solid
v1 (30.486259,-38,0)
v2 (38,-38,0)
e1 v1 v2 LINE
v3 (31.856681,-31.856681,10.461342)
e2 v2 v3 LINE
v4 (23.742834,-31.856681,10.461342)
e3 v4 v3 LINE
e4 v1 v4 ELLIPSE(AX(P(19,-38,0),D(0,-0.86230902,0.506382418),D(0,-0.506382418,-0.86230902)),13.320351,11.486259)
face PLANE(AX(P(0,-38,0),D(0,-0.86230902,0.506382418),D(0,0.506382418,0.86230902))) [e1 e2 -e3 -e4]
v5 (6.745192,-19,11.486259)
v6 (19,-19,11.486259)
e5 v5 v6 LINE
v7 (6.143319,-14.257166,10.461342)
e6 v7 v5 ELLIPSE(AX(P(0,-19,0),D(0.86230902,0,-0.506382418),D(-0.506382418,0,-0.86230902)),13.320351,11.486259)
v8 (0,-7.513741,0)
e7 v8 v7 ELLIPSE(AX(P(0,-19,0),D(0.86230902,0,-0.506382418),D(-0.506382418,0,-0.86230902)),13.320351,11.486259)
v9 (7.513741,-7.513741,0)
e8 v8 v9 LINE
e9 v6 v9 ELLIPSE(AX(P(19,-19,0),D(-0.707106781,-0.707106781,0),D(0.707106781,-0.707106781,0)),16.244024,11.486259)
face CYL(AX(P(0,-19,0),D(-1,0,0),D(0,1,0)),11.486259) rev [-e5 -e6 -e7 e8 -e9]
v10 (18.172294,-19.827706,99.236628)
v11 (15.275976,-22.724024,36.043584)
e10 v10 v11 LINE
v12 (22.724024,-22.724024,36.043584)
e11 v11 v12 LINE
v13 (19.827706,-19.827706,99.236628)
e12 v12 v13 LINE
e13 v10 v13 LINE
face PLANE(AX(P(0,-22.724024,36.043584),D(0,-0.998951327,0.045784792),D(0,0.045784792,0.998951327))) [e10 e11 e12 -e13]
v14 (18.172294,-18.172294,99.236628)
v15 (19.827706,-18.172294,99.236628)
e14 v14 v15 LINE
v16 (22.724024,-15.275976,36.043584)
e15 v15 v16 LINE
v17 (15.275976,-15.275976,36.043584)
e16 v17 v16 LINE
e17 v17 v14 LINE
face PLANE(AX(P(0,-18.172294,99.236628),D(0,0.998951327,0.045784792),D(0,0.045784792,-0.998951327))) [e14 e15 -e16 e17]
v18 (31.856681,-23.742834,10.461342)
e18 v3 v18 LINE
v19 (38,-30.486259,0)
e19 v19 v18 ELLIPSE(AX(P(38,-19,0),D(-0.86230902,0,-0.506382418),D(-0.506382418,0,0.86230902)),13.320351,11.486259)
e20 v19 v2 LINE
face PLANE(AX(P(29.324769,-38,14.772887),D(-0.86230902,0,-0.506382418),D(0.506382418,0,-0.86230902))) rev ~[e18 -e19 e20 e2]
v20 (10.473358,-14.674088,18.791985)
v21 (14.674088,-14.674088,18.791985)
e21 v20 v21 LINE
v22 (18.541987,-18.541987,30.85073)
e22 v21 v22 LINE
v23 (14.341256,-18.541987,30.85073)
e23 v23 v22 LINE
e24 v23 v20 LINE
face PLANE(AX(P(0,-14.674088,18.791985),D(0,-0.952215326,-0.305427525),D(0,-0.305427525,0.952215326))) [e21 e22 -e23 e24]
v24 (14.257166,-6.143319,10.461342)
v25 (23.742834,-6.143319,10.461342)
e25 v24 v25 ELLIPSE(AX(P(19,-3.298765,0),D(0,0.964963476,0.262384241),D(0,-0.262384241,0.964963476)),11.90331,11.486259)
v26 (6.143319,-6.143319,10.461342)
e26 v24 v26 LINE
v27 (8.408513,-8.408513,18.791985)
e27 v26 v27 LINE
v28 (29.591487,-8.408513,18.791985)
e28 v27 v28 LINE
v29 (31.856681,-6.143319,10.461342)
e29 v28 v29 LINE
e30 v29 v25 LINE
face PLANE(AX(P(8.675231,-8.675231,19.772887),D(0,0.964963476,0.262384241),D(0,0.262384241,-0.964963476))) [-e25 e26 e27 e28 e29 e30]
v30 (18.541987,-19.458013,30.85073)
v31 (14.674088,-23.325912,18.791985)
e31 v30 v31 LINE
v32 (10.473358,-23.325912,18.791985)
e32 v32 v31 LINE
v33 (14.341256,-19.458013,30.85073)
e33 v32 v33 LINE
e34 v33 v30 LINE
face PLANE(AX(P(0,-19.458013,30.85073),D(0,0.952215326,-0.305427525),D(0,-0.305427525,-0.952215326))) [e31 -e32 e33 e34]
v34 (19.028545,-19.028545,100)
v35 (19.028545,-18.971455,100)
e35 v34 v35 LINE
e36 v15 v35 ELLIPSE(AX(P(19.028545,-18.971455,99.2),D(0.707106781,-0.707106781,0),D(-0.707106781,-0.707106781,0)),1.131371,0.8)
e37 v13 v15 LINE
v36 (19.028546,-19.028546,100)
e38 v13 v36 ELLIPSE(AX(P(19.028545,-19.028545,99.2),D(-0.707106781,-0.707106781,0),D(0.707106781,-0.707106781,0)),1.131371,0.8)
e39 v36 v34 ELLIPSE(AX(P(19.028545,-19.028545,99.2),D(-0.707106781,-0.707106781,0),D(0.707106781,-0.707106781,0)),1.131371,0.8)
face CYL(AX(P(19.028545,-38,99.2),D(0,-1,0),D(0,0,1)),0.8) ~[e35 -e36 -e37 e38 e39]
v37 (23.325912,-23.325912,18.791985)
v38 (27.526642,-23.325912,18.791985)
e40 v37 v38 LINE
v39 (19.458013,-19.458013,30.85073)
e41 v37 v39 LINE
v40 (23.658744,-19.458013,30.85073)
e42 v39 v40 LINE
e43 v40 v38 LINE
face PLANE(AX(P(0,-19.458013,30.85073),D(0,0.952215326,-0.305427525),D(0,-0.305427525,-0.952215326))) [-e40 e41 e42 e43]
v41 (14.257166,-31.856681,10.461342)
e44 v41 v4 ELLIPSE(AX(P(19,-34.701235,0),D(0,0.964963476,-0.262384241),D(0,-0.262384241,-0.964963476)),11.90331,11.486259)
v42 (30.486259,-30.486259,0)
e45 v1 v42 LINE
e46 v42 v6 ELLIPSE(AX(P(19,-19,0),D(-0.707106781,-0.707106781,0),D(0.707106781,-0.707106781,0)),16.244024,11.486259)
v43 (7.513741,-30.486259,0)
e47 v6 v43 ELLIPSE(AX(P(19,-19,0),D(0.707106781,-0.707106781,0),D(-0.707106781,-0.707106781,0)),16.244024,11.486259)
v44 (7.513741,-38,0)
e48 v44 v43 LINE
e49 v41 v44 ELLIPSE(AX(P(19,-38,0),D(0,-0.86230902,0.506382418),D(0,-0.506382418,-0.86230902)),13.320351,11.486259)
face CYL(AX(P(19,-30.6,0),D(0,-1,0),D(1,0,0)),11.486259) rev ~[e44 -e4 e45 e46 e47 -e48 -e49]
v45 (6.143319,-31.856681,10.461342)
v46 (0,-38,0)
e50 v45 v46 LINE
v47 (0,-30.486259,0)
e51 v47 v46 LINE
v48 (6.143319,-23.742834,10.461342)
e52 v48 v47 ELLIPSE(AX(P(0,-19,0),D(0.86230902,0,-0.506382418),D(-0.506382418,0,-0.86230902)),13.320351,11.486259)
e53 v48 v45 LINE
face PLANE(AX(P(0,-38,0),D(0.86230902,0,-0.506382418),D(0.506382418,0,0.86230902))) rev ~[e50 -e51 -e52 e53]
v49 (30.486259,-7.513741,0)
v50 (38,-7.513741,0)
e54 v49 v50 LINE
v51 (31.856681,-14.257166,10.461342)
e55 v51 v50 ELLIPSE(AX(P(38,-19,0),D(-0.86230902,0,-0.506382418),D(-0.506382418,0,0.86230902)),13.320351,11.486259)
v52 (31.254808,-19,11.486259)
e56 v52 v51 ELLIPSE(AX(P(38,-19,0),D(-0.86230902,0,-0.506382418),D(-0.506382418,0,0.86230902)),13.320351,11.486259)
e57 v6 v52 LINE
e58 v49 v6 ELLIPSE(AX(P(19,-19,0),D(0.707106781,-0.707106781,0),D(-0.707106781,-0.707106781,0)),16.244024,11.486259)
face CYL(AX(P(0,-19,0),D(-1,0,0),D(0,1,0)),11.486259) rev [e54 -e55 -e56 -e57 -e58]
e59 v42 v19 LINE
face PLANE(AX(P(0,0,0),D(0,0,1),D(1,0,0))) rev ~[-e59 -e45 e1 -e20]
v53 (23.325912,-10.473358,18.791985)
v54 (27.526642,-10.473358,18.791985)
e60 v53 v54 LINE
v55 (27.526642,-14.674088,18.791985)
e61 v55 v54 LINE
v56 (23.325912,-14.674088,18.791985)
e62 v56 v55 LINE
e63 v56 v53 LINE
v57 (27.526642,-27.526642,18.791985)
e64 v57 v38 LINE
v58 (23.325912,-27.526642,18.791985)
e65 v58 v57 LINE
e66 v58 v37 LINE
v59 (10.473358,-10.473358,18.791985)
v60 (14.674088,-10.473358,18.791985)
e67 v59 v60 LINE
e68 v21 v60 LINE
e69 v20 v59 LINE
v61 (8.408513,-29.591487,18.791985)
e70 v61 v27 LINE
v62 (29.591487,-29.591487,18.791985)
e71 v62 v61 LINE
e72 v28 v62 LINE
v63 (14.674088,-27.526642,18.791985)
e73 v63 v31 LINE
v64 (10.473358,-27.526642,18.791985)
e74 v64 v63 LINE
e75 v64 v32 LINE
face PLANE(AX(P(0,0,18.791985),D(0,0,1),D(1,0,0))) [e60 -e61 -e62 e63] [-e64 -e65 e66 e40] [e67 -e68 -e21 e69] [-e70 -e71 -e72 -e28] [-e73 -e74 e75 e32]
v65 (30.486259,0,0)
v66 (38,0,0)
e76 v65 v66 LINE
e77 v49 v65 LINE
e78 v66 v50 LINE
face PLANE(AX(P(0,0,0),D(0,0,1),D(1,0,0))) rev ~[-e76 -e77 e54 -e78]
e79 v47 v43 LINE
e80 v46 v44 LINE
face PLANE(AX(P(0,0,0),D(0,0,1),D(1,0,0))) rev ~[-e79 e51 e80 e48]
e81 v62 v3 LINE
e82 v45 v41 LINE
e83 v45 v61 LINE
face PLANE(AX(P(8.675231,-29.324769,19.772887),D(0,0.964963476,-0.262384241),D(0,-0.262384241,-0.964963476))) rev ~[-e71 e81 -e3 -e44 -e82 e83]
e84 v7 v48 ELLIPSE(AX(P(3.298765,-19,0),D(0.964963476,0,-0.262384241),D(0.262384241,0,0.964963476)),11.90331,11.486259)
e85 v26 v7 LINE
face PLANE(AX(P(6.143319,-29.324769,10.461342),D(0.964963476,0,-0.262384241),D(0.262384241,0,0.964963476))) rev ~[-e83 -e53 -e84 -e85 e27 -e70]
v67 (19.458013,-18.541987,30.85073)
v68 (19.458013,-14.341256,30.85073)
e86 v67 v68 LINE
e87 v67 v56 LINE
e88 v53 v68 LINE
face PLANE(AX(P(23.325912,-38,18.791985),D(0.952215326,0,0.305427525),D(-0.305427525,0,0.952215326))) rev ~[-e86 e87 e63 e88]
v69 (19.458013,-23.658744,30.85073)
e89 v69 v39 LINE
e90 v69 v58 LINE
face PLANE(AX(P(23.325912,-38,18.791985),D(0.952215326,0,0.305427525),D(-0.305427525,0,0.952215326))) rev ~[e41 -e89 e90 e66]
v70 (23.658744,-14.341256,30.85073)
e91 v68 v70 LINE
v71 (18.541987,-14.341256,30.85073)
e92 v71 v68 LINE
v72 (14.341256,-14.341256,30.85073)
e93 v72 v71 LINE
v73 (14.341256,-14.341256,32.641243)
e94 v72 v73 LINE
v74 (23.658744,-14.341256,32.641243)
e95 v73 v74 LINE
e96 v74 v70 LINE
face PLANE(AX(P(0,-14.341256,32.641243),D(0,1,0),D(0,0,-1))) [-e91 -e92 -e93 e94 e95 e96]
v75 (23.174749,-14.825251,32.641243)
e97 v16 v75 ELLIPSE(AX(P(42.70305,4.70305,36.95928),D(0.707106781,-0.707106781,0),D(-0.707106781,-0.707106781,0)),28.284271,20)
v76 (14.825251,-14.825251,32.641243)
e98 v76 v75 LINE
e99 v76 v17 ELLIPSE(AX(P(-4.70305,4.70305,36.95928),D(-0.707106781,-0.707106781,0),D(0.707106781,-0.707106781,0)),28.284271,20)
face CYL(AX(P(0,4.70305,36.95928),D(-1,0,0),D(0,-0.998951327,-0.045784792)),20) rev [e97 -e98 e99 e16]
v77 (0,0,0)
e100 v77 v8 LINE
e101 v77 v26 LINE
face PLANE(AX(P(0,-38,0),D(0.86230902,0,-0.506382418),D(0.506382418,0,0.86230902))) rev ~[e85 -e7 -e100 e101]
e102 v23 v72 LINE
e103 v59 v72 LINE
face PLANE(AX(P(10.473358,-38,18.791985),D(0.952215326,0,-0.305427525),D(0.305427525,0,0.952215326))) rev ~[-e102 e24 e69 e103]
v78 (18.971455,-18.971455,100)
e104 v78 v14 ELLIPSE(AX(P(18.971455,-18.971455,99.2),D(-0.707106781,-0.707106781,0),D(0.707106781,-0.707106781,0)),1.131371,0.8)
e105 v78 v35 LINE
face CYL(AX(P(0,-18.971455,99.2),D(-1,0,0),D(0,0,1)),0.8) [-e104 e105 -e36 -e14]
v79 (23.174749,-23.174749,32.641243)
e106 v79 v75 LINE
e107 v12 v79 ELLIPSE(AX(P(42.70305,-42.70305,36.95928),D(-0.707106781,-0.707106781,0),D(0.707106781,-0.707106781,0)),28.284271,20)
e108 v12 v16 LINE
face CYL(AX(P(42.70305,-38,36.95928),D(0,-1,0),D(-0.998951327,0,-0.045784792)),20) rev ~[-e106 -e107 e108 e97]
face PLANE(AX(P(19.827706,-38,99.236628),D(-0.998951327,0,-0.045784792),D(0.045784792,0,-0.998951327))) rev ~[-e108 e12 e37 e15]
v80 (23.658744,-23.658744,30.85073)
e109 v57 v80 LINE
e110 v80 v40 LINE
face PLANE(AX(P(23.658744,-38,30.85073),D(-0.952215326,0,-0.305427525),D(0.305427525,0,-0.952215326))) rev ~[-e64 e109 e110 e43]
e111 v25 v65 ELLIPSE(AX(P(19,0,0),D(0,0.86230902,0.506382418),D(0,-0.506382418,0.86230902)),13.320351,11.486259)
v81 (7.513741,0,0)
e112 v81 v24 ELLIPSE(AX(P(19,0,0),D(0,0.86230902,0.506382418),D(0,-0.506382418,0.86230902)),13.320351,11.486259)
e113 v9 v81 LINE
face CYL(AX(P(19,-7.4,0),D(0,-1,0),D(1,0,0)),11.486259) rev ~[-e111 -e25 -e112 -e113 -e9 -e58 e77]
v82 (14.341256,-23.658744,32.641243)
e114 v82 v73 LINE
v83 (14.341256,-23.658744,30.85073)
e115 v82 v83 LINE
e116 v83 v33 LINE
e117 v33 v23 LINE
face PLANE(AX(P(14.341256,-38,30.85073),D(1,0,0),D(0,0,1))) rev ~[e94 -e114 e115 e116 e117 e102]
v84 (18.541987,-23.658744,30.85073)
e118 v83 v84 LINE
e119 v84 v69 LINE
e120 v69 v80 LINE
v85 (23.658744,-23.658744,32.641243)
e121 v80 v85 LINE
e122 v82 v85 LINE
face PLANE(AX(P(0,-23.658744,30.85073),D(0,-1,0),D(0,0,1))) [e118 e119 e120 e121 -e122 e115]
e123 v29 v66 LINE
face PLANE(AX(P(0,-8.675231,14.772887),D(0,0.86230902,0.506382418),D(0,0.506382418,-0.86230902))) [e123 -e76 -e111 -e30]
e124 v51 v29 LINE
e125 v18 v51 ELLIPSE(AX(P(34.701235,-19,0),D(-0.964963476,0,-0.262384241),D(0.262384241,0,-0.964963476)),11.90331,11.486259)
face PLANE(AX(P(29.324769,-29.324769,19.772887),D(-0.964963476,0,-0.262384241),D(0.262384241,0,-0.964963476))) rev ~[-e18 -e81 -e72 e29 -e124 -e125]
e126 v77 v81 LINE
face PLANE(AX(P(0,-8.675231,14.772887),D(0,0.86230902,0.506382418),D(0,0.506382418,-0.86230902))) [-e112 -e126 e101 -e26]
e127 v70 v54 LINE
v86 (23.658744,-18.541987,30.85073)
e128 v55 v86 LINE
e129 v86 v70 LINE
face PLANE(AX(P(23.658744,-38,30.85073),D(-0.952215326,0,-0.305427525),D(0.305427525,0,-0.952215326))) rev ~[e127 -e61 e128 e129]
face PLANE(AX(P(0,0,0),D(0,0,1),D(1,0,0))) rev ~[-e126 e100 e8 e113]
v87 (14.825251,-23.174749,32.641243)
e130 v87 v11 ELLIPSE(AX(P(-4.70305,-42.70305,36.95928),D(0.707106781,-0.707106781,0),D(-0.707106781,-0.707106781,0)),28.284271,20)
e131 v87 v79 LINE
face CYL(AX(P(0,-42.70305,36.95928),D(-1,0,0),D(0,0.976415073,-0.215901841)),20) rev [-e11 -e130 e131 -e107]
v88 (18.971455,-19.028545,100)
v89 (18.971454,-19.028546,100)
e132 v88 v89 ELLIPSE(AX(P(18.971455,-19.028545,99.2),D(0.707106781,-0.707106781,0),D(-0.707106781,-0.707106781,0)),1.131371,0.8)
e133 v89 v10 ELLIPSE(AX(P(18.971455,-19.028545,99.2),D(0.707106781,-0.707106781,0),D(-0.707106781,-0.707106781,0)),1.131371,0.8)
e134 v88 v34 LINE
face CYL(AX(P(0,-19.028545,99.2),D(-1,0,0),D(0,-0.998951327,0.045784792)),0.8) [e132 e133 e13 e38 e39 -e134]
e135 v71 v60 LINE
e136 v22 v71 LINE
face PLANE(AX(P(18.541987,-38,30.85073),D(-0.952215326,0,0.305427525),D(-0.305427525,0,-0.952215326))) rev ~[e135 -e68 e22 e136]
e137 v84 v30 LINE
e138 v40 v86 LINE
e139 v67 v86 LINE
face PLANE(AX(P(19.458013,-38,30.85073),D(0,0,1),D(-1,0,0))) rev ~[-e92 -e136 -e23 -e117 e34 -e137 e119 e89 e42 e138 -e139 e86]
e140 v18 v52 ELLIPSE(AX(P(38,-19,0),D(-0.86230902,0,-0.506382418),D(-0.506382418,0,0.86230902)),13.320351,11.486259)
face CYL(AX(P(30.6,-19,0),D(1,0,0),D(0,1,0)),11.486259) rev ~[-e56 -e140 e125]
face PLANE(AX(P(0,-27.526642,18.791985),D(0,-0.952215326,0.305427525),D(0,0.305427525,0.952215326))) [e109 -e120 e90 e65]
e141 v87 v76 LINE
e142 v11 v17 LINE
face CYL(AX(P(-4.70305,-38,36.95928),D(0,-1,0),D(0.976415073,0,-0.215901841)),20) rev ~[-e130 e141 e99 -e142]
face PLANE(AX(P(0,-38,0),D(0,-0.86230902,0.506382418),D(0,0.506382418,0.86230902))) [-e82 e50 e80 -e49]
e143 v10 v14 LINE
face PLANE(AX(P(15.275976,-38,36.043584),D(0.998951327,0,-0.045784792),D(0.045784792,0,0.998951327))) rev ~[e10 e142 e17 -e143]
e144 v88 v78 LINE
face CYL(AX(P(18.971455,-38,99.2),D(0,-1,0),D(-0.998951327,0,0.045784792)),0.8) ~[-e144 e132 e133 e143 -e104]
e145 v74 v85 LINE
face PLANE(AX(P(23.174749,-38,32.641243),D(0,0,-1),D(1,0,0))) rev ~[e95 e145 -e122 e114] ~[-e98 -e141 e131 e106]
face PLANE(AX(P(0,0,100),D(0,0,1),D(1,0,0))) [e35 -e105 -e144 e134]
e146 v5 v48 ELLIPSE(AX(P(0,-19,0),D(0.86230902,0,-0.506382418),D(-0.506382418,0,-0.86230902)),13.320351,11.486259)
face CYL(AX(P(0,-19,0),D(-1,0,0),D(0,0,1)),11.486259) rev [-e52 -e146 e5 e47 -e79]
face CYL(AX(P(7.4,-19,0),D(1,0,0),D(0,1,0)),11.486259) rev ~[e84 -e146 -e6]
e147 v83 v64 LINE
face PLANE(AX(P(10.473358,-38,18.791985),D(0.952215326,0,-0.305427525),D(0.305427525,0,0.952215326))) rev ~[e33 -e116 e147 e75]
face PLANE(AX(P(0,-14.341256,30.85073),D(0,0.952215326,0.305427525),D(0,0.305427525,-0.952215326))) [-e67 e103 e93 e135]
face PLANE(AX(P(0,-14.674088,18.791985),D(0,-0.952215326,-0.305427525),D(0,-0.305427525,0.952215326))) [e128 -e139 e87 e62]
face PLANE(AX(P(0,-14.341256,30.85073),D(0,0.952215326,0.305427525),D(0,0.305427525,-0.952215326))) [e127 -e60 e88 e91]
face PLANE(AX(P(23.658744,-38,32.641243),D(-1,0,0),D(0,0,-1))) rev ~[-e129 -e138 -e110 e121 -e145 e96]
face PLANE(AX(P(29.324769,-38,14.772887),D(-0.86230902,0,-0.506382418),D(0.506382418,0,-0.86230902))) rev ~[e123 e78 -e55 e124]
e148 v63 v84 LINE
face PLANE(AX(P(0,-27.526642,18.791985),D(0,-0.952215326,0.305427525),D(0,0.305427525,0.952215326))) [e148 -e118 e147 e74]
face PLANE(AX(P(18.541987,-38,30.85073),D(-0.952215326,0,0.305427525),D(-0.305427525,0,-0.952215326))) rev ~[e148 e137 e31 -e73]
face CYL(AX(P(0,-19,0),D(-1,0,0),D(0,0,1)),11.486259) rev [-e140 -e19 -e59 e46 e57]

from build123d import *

# Parameters (mm, degrees)
F0_W          = 38
F0_H          = 100
F1_DEPTH      = 38
F3_DEPTH      = 38.001
F4_W          = 59.0429029957
F4_H          = 114.0045975335
F5_DEPTH      = 38.001
F6_T4_DEPTH   = 20.6495370786
F6_T10_DEPTH  = 33.6326816688
F6_T16_DEPTH  = 20.6495370786
F6_S17_R      = 11.4862592402
F6_T18_DEPTH  = 13
F6_T25_DEPTH  = 20.6495370786
F6_T31_DEPTH  = 33.6326816688
F6_T37_DEPTH  = 33.6326816688
F6_T43_DEPTH  = 20.6495370786
F6_T49_DEPTH  = 20.6495370786
F6_S53_R      = 11.4862592402
F6_T54_DEPTH  = 13
F6_T58_DEPTH  = 33.6326816688
F6_T64_DEPTH  = 20.6495370786
F6_T70_DEPTH  = 33.6326816688
F6_T76_DEPTH  = 20.6495370786
F6_T82_DEPTH  = 20.6495370786
F6_S84_R      = 11.4862592402
F6_T85_DEPTH  = 13
F6_T91_DEPTH  = 33.6326816688
F6_T97_DEPTH  = 20.6495370786
F6_T103_DEPTH = 33.6326816688
F6_T109_DEPTH = 20.6495370786
F6_T115_DEPTH = 20.6495370786
F6_S119_R     = 11.4862592402
F6_T120_DEPTH = 13
F6_T124_DEPTH = 33.6326816688
F6_T130_DEPTH = 20.6495370786
F6_T137_DEPTH = 33.6326816688
F6_T143_DEPTH = 33.6326816688
F6_T152_DEPTH = 33.6326816688
F6_T158_DEPTH = 33.6326816688
F6_T167_DEPTH = 33.6326816688
F6_T173_DEPTH = 33.6326816688
F6_T182_DEPTH = 33.6326816688
F6_T188_DEPTH = 33.6326816688


# Not quite as in the source:
# - a fillet or chamfer that OpenCascade refuses, or shapes differently, is made with other operations: its cross-section is extruded or revolved along the edge and cut away or added


with BuildPart() as f1:
    # F0 (on Front) → F1 (new body)
    with BuildSketch(Plane.XZ):
        with Locations((19, 50)):
            Rectangle(F0_W, F0_H)
    extrude(amount=F1_DEPTH)

    # F2 (on face) → F3 (cut, through all)
    with BuildSketch(Plane.XZ.offset(38)):
        with BuildLine():
            ThreePointArc((18.1722940034, 99.2366278339), (18.4188712552, 99.7784903919), (18.9714550646, 100))
            Line((18.9714550646, 100), (0, 100))
            Line((0, 100), (0, 0))
            Line((0, 0), (8.6752314607, 14.7728872032))
            Line((8.6752314607, 14.7728872032), (8.6752314607, 18.7919850665))
            Line((8.6752314607, 18.7919850665), (10.4733575719, 18.7919850665))
            Line((10.4733575719, 18.7919850665), (14.3412563191, 30.8507295043))
            Line((14.3412563191, 30.8507295043), (14.3412563191, 32.6412431896))
            Line((14.3412563191, 32.6412431896), (14.8252512637, 32.6412431896))
            ThreePointArc((14.8252512637, 32.6412431896), (15.1237302322, 34.3327275734), (15.2759763299, 36.0435841545))
            Line((15.2759763299, 36.0435841545), (18.1722940034, 99.2366278339))
        make_face()
        with BuildLine():
            Line((7.5137407598, 0), (30.4862592402, 0))
            ThreePointArc((30.4862592402, 0), (27.1220117992, 8.1220117992), (19, 11.4862592402))
            ThreePointArc((19, 11.4862592402), (10.8779882008, 8.1220117992), (7.5137407598, 0))
        make_face()
        with BuildLine():
            Line((38, 100), (19.0285449354, 100))
            ThreePointArc((19.0285449354, 100), (19.5811287448, 99.7784903919), (19.8277059966, 99.2366278339))
            Line((19.8277059966, 99.2366278339), (22.7240236701, 36.0435841545))
            ThreePointArc((22.7240236701, 36.0435841545), (22.8762697678, 34.3327275734), (23.1747487363, 32.6412431896))
            Line((23.1747487363, 32.6412431896), (23.6587436809, 32.6412431896))
            Line((23.6587436809, 32.6412431896), (23.6587436809, 30.8507295043))
            Line((23.6587436809, 30.8507295043), (27.5266424281, 18.7919850665))
            Line((27.5266424281, 18.7919850665), (29.3247685393, 18.7919850665))
            Line((29.3247685393, 18.7919850665), (29.3247685393, 14.7728872032))
            Line((29.3247685393, 14.7728872032), (38, 0))
            Line((38, 0), (38, 100))
        make_face()
        Polygon((18.5419868585, 30.8507295043), (14.6740881113, 18.7919850665), (23.3259118887, 18.7919850665), (19.4580131415, 30.8507295043), align=None)
    extrude(amount=-F3_DEPTH, mode=Mode.SUBTRACT)

    # F4 (on Right) → F5 (cut, through all)
    with BuildSketch(Plane.YZ):
        with Locations((-17.0494974502, 52.1172431763)):
            Rectangle(F4_W, F4_H)
        with BuildLine():
            Line((-19.0285449354, 100), (-19, 100))
            Line((-19, 100), (-18.9714550646, 100))
            ThreePointArc((-18.9714550646, 100), (-18.4188712552, 99.7784903919), (-18.1722940034, 99.2366278339))
            Line((-18.1722940034, 99.2366278339), (-15.2759763299, 36.0435841545))
            ThreePointArc((-15.2759763299, 36.0435841545), (-15.1237302322, 34.3327275734), (-14.8252512637, 32.6412431896))
            Line((-14.8252512637, 32.6412431896), (-14.3412563191, 32.6412431896))
            Line((-14.3412563191, 32.6412431896), (-14.3412563191, 30.8507295043))
            Line((-14.3412563191, 30.8507295043), (-10.4733575719, 18.7919850665))
            Line((-10.4733575719, 18.7919850665), (-8.6752314607, 18.7919850665))
            Line((-8.6752314607, 18.7919850665), (-8.6752314607, 14.7728872032))
            Line((-8.6752314607, 14.7728872032), (0, 0))
            Line((0, 0), (-7.5137407598, 0))
            ThreePointArc((-7.5137407598, 0), (-10.8779882008, 8.1220117992), (-19, 11.4862592402))
            ThreePointArc((-19, 11.4862592402), (-27.1220117992, 8.1220117992), (-30.4862592402, 0))
            Line((-30.4862592402, 0), (-38, 0))
            Line((-38, 0), (-29.3247685393, 14.7728872032))
            Line((-29.3247685393, 14.7728872032), (-29.3247685393, 18.7919850665))
            Line((-29.3247685393, 18.7919850665), (-27.5266424281, 18.7919850665))
            Line((-27.5266424281, 18.7919850665), (-23.6587436809, 30.8507295043))
            Line((-23.6587436809, 30.8507295043), (-23.6587436809, 32.6412431896))
            Line((-23.6587436809, 32.6412431896), (-23.1747487363, 32.6412431896))
            ThreePointArc((-23.1747487363, 32.6412431896), (-22.8762697678, 34.3327275734), (-22.7240236701, 36.0435841545))
            Line((-22.7240236701, 36.0435841545), (-19.8277059966, 99.2366278339))
            ThreePointArc((-19.8277059966, 99.2366278339), (-19.5811287448, 99.7784903919), (-19.0285449354, 100))
        make_face(mode=Mode.SUBTRACT)
        Polygon((-14.6740881113, 18.7919850665), (-18.5419868585, 30.8507295043), (-19.4580131415, 30.8507295043), (-23.3259118887, 18.7919850665), align=None)
    extrude(amount=F5_DEPTH, mode=Mode.SUBTRACT)

    # F6: chamfer of 5 on 4 edges, made by hand


with BuildPart() as f6_tool2:
    # F6_s3 → F6_t4 (new body)
    with BuildSketch(Plane.XZ.offset(29.3247685393)):
        Polygon((6.1433193707, 10.461342101), (8.6752314607, 19.7728872032), (8.6752314607, 14.7728872032), align=None)
    extrude(amount=-F6_T4_DEPTH)

    split(bisect_by=Plane(origin=(0, -28.2559201757, 16.59300882), x_dir=(1, 0, 0), z_dir=(0, -0.8623090204, 0.506382418)), keep=Keep.TOP)

    split(bisect_by=Plane.XY.offset(18.7919850665), keep=Keep.BOTTOM)


with BuildPart() as f1_1:
    add(f1.part)

    # F6_t1: union F6_tool2
    add(f6_tool2.part)


with BuildPart() as f6_tool8:
    # F6_s9 → F6_t10 (new body)
    with BuildSketch(Plane.XZ.offset(42.3079131295)):
        Polygon((6.1433193707, 10.461342101), (8.6752314607, 19.7728872032), (8.6752314607, 14.7728872032), align=None)
    extrude(amount=-F6_T10_DEPTH)

    split(bisect_by=Plane(origin=(0, -28.2559201757, 16.59300882), x_dir=(1, 0, 0), z_dir=(0, 0.8623090204, -0.506382418)), keep=Keep.TOP)

    split(bisect_by=Plane.XZ.offset(29.3247685393), keep=Keep.TOP)


with BuildPart() as f1_2:
    add(f1_1.part)

    # F6_t7: union F6_tool8
    add(f6_tool8.part)


with BuildPart() as f6_tool14:
    # F6_s15 → F6_t16 (new body)
    with BuildSketch(Plane.XZ.offset(29.3247685393)):
        Polygon((6.1433193707, 10.461342101), (8.6752314607, 19.7728872032), (8.6752314607, 14.7728872032), align=None)
    extrude(amount=-F6_T16_DEPTH)

    # F6_s17 → F6_t18 (cut, symmetric)
    with BuildSketch(Plane.YZ.offset(7.4)):
        with Locations((-19, 0)):
            Circle(F6_S17_R)
    extrude(amount=F6_T18_DEPTH, both=True, mode=Mode.SUBTRACT)

    split(bisect_by=Plane(origin=(0, -28.2559201757, 16.59300882), x_dir=(1, 0, 0), z_dir=(0, 0.8623090204, -0.506382418)), keep=Keep.TOP)

    split(bisect_by=Plane(origin=(0, 0, 0), x_dir=(1, 0, 0), z_dir=(0, -0.8623090204, -0.506382418)), keep=Keep.TOP)

    split(bisect_by=Plane.XY.offset(18.7919850665), keep=Keep.BOTTOM)


with BuildPart() as f1_3:
    add(f1_2.part)

    # F6_t13: union F6_tool14
    add(f6_tool14.part)


with BuildPart() as f6_tool23:
    # F6_s24 → F6_t25 (new body)
    with BuildSketch(Plane.XZ.offset(29.3247685393)):
        Polygon((6.1433193707, 10.461342101), (8.6752314607, 19.7728872032), (8.6752314607, 14.7728872032), align=None)
    extrude(amount=-F6_T25_DEPTH)

    split(bisect_by=Plane(origin=(0, 0, 0), x_dir=(1, 0, 0), z_dir=(0, 0.8623090204, 0.506382418)), keep=Keep.TOP)

    split(bisect_by=Plane.XY.offset(18.7919850665), keep=Keep.BOTTOM)


with BuildPart() as f1_4:
    add(f1_3.part)

    # F6_t22: union F6_tool23
    add(f6_tool23.part)


with BuildPart() as f6_tool29:
    # F6_s30 → F6_t31 (new body)
    with BuildSketch(Plane.XZ.offset(29.3247685393)):
        Polygon((6.1433193707, 10.461342101), (8.6752314607, 19.7728872032), (8.6752314607, 14.7728872032), align=None)
    extrude(amount=-F6_T31_DEPTH)

    split(bisect_by=Plane(origin=(0, 0, 0), x_dir=(1, 0, 0), z_dir=(0, -0.8623090204, -0.506382418)), keep=Keep.TOP)

    split(bisect_by=Plane.XZ.offset(8.6752314607), keep=Keep.BOTTOM)


with BuildPart() as f1_5:
    add(f1_4.part)

    # F6_t28: union F6_tool29
    add(f6_tool29.part)


with BuildPart() as f6_tool35:
    # F6_s36 → F6_t37 (new body)
    with BuildSketch(Plane.YZ.offset(-4.3079131295)):
        Polygon((-29.3247685393, 19.7728872032), (-31.8566806293, 10.461342101), (-29.3247685393, 14.7728872032), align=None)
    extrude(amount=F6_T37_DEPTH)

    split(bisect_by=Plane(origin=(0, 0, 0), x_dir=(0, 1, 0), z_dir=(0.8623090204, 0, -0.506382418)), keep=Keep.TOP)

    split(bisect_by=Plane.YZ.offset(8.6752314607), keep=Keep.BOTTOM)


with BuildPart() as f1_6:
    add(f1_5.part)

    # F6_t34: union F6_tool35
    add(f6_tool35.part)


with BuildPart() as f6_tool41:
    # F6_s42 → F6_t43 (new body)
    with BuildSketch(Plane.YZ.offset(8.6752314607)):
        Polygon((-29.3247685393, 19.7728872032), (-31.8566806293, 10.461342101), (-29.3247685393, 14.7728872032), align=None)
    extrude(amount=F6_T43_DEPTH)

    split(bisect_by=Plane(origin=(0, 0, 0), x_dir=(0, 1, 0), z_dir=(-0.8623090204, 0, 0.506382418)), keep=Keep.TOP)

    split(bisect_by=Plane.XY.offset(18.7919850665), keep=Keep.BOTTOM)


with BuildPart() as f1_7:
    add(f1_6.part)

    # F6_t40: union F6_tool41
    add(f6_tool41.part)


with BuildPart() as f6_tool47:
    # F6_s48 → F6_t49 (new body)
    with BuildSketch(Plane.YZ.offset(8.6752314607)):
        Polygon((-29.3247685393, 19.7728872032), (-31.8566806293, 10.461342101), (-29.3247685393, 14.7728872032), align=None)
    extrude(amount=F6_T49_DEPTH)

    split(bisect_by=Plane(origin=(0, 0, 0), x_dir=(0, 1, 0), z_dir=(0.8623090204, 0, -0.506382418)), keep=Keep.TOP)

    split(bisect_by=Plane.XY.offset(18.7919850665), keep=Keep.BOTTOM)

    split(bisect_by=Plane(origin=(28.2559201757, 0, 16.59300882), x_dir=(0, 1, 0), z_dir=(-0.8623090204, 0, -0.506382418)), keep=Keep.TOP)

    # F6_s53 → F6_t54 (cut, symmetric)
    with BuildSketch(Plane.XZ.offset(30.6)):
        with Locations((19, 0)):
            Circle(F6_S53_R)
    extrude(amount=F6_T54_DEPTH, both=True, mode=Mode.SUBTRACT)


with BuildPart() as f1_8:
    add(f1_7.part)

    # F6_t46: union F6_tool47
    add(f6_tool47.part)


with BuildPart() as f6_tool56:
    # F6_s57 → F6_t58 (new body)
    with BuildSketch(Plane.YZ.offset(8.6752314607)):
        Polygon((-29.3247685393, 19.7728872032), (-31.8566806293, 10.461342101), (-29.3247685393, 14.7728872032), align=None)
    extrude(amount=F6_T58_DEPTH)

    split(bisect_by=Plane.YZ.offset(29.3247685393), keep=Keep.TOP)

    split(bisect_by=Plane(origin=(28.2559201757, 0, 16.59300882), x_dir=(0, 1, 0), z_dir=(-0.8623090204, 0, -0.506382418)), keep=Keep.TOP)


with BuildPart() as f1_9:
    add(f1_8.part)

    # F6_t55: union F6_tool56
    add(f6_tool56.part)


with BuildPart() as f6_tool62:
    # F6_s63 → F6_t64 (new body)
    with BuildSketch(Plane.YZ.offset(8.6752314607)):
        Polygon((-29.3247685393, 19.7728872032), (-31.8566806293, 10.461342101), (-29.3247685393, 14.7728872032), align=None)
    extrude(amount=F6_T64_DEPTH)

    split(bisect_by=Plane.XY.offset(18.7919850665), keep=Keep.BOTTOM)

    split(bisect_by=Plane(origin=(28.2559201757, 0, 16.59300882), x_dir=(0, 1, 0), z_dir=(0.8623090204, 0, 0.506382418)), keep=Keep.TOP)


with BuildPart() as f1_10:
    add(f1_9.part)

    # F6_t61: union F6_tool62
    add(f6_tool62.part)


with BuildPart() as f6_tool68:
    # F6_s69 → F6_t70 (new body)
    with BuildSketch(Plane.XZ.offset(42.3079131295)):
        Polygon((29.3247685393, 19.7728872032), (31.8566806293, 10.461342101), (29.3247685393, 14.7728872032), align=None)
    extrude(amount=-F6_T70_DEPTH)

    split(bisect_by=Plane.XZ.offset(29.3247685393), keep=Keep.TOP)

    split(bisect_by=Plane(origin=(0, -28.2559201757, 16.59300882), x_dir=(1, 0, 0), z_dir=(0, 0.8623090204, -0.506382418)), keep=Keep.TOP)


with BuildPart() as f1_11:
    add(f1_10.part)

    # F6_t67: union F6_tool68
    add(f6_tool68.part)


with BuildPart() as f6_tool74:
    # F6_s75 → F6_t76 (new body)
    with BuildSketch(Plane.XZ.offset(29.3247685393)):
        Polygon((29.3247685393, 19.7728872032), (31.8566806293, 10.461342101), (29.3247685393, 14.7728872032), align=None)
    extrude(amount=-F6_T76_DEPTH)

    split(bisect_by=Plane.XY.offset(18.7919850665), keep=Keep.BOTTOM)

    split(bisect_by=Plane(origin=(0, -28.2559201757, 16.59300882), x_dir=(1, 0, 0), z_dir=(0, -0.8623090204, 0.506382418)), keep=Keep.TOP)


with BuildPart() as f1_12:
    add(f1_11.part)

    # F6_t73: union F6_tool74
    add(f6_tool74.part)


with BuildPart() as f6_tool80:
    # F6_s81 → F6_t82 (new body)
    with BuildSketch(Plane.XZ.offset(29.3247685393)):
        Polygon((29.3247685393, 19.7728872032), (31.8566806293, 10.461342101), (29.3247685393, 14.7728872032), align=None)
    extrude(amount=-F6_T82_DEPTH)

    split(bisect_by=Plane.XY.offset(18.7919850665), keep=Keep.BOTTOM)

    # F6_s84 → F6_t85 (cut, symmetric)
    with BuildSketch(Plane.YZ.offset(30.6)):
        with Locations((-19, 0)):
            Circle(F6_S84_R)
    extrude(amount=F6_T85_DEPTH, both=True, mode=Mode.SUBTRACT)

    split(bisect_by=Plane(origin=(0, 0, 0), x_dir=(1, 0, 0), z_dir=(0, -0.8623090204, -0.506382418)), keep=Keep.TOP)

    split(bisect_by=Plane(origin=(0, -28.2559201757, 16.59300882), x_dir=(1, 0, 0), z_dir=(0, 0.8623090204, -0.506382418)), keep=Keep.TOP)


with BuildPart() as f1_13:
    add(f1_12.part)

    # F6_t79: union F6_tool80
    add(f6_tool80.part)


with BuildPart() as f6_tool89:
    # F6_s90 → F6_t91 (new body)
    with BuildSketch(Plane.XZ.offset(29.3247685393)):
        Polygon((29.3247685393, 19.7728872032), (31.8566806293, 10.461342101), (29.3247685393, 14.7728872032), align=None)
    extrude(amount=-F6_T91_DEPTH)

    split(bisect_by=Plane.XZ.offset(8.6752314607), keep=Keep.BOTTOM)

    split(bisect_by=Plane(origin=(0, 0, 0), x_dir=(1, 0, 0), z_dir=(0, -0.8623090204, -0.506382418)), keep=Keep.TOP)


with BuildPart() as f1_14:
    add(f1_13.part)

    # F6_t88: union F6_tool89
    add(f6_tool89.part)


with BuildPart() as f6_tool95:
    # F6_s96 → F6_t97 (new body)
    with BuildSketch(Plane.XZ.offset(29.3247685393)):
        Polygon((29.3247685393, 19.7728872032), (31.8566806293, 10.461342101), (29.3247685393, 14.7728872032), align=None)
    extrude(amount=-F6_T97_DEPTH)

    split(bisect_by=Plane.XY.offset(18.7919850665), keep=Keep.BOTTOM)

    split(bisect_by=Plane(origin=(0, 0, 0), x_dir=(1, 0, 0), z_dir=(0, 0.8623090204, 0.506382418)), keep=Keep.TOP)


with BuildPart() as f1_15:
    add(f1_14.part)

    # F6_t94: union F6_tool95
    add(f6_tool95.part)


with BuildPart() as f6_tool101:
    # F6_s102 → F6_t103 (new body)
    with BuildSketch(Plane.YZ.offset(-4.3079131295)):
        Polygon((-8.6752314607, 19.7728872032), (-6.1433193707, 10.461342101), (-8.6752314607, 14.7728872032), align=None)
    extrude(amount=F6_T103_DEPTH)

    split(bisect_by=Plane(origin=(0, 0, 0), x_dir=(0, 1, 0), z_dir=(0.8623090204, 0, -0.506382418)), keep=Keep.TOP)

    split(bisect_by=Plane.YZ.offset(8.6752314607), keep=Keep.BOTTOM)


with BuildPart() as f1_16:
    add(f1_15.part)

    # F6_t100: union F6_tool101
    add(f6_tool101.part)


with BuildPart() as f6_tool107:
    # F6_s108 → F6_t109 (new body)
    with BuildSketch(Plane.YZ.offset(8.6752314607)):
        Polygon((-8.6752314607, 19.7728872032), (-6.1433193707, 10.461342101), (-8.6752314607, 14.7728872032), align=None)
    extrude(amount=F6_T109_DEPTH)

    split(bisect_by=Plane(origin=(0, 0, 0), x_dir=(0, 1, 0), z_dir=(-0.8623090204, 0, 0.506382418)), keep=Keep.TOP)

    split(bisect_by=Plane.XY.offset(18.7919850665), keep=Keep.BOTTOM)


with BuildPart() as f1_17:
    add(f1_16.part)

    # F6_t106: union F6_tool107
    add(f6_tool107.part)


with BuildPart() as f6_tool113:
    # F6_s114 → F6_t115 (new body)
    with BuildSketch(Plane.YZ.offset(8.6752314607)):
        Polygon((-8.6752314607, 19.7728872032), (-6.1433193707, 10.461342101), (-8.6752314607, 14.7728872032), align=None)
    extrude(amount=F6_T115_DEPTH)

    split(bisect_by=Plane(origin=(0, 0, 0), x_dir=(0, 1, 0), z_dir=(0.8623090204, 0, -0.506382418)), keep=Keep.TOP)

    split(bisect_by=Plane.XY.offset(18.7919850665), keep=Keep.BOTTOM)

    split(bisect_by=Plane(origin=(28.2559201757, 0, 16.59300882), x_dir=(0, 1, 0), z_dir=(-0.8623090204, 0, -0.506382418)), keep=Keep.TOP)

    # F6_s119 → F6_t120 (cut, symmetric)
    with BuildSketch(Plane.XZ.offset(7.4)):
        with Locations((19, 0)):
            Circle(F6_S119_R)
    extrude(amount=F6_T120_DEPTH, both=True, mode=Mode.SUBTRACT)


with BuildPart() as f1_18:
    add(f1_17.part)

    # F6_t112: union F6_tool113
    add(f6_tool113.part)


with BuildPart() as f6_tool122:
    # F6_s123 → F6_t124 (new body)
    with BuildSketch(Plane.YZ.offset(8.6752314607)):
        Polygon((-8.6752314607, 19.7728872032), (-6.1433193707, 10.461342101), (-8.6752314607, 14.7728872032), align=None)
    extrude(amount=F6_T124_DEPTH)

    split(bisect_by=Plane.YZ.offset(29.3247685393), keep=Keep.TOP)

    split(bisect_by=Plane(origin=(28.2559201757, 0, 16.59300882), x_dir=(0, 1, 0), z_dir=(-0.8623090204, 0, -0.506382418)), keep=Keep.TOP)


with BuildPart() as f1_19:
    add(f1_18.part)

    # F6_t121: union F6_tool122
    add(f6_tool122.part)


with BuildPart() as f6_tool128:
    # F6_s129 → F6_t130 (new body)
    with BuildSketch(Plane.YZ.offset(8.6752314607)):
        Polygon((-8.6752314607, 19.7728872032), (-6.1433193707, 10.461342101), (-8.6752314607, 14.7728872032), align=None)
    extrude(amount=F6_T130_DEPTH)

    split(bisect_by=Plane.XY.offset(18.7919850665), keep=Keep.BOTTOM)

    split(bisect_by=Plane(origin=(28.2559201757, 0, 16.59300882), x_dir=(0, 1, 0), z_dir=(0.8623090204, 0, 0.506382418)), keep=Keep.TOP)


with BuildPart() as f1_20:
    add(f1_19.part)

    # F6_t127: union F6_tool128
    add(f6_tool128.part)


with BuildPart() as f6_tool135:
    # F6_s136 → F6_t137 (new body)
    with BuildSketch(Plane.XZ.offset(42.3079131295)):
        Polygon((6.1433193707, 10.461342101), (8.6752314607, 19.7728872032), (8.6752314607, 14.7728872032), align=None)
    extrude(amount=-F6_T137_DEPTH)

    split(bisect_by=Plane(origin=(0, -28.2559201757, 16.59300882), x_dir=(1, 0, 0), z_dir=(0, -0.8623090204, 0.506382418)), keep=Keep.TOP)

    split(bisect_by=Plane.XZ.offset(29.3247685393), keep=Keep.TOP)

    split(bisect_by=Plane.XY.offset(18.7919850665), keep=Keep.BOTTOM)


with BuildPart() as f6_tool141:
    # F6_s142 → F6_t143 (new body)
    with BuildSketch(Plane.YZ.offset(-4.3079131295)):
        Polygon((-29.3247685393, 19.7728872032), (-31.8566806293, 10.461342101), (-29.3247685393, 14.7728872032), align=None)
    extrude(amount=F6_T143_DEPTH)

    split(bisect_by=Plane(origin=(0, 0, 0), x_dir=(0, 1, 0), z_dir=(-0.8623090204, 0, 0.506382418)), keep=Keep.TOP)

    split(bisect_by=Plane.YZ.offset(8.6752314607), keep=Keep.BOTTOM)

    split(bisect_by=Plane.XY.offset(18.7919850665), keep=Keep.BOTTOM)


with BuildPart() as f6_tool135_1:
    add(f6_tool135.part)

    # F6_t147: intersect F6_tool141
    add(f6_tool141.part, mode=Mode.INTERSECT)


with BuildPart() as f1_21:
    add(f1_20.part)

    # F6_t133: union F6_tool135
    add(f6_tool135_1.part)


with BuildPart() as f6_tool150:
    # F6_s151 → F6_t152 (new body)
    with BuildSketch(Plane.XZ.offset(29.3247685393)):
        Polygon((6.1433193707, 10.461342101), (8.6752314607, 19.7728872032), (8.6752314607, 14.7728872032), align=None)
    extrude(amount=-F6_T152_DEPTH)

    split(bisect_by=Plane(origin=(0, 0, 0), x_dir=(1, 0, 0), z_dir=(0, 0.8623090204, 0.506382418)), keep=Keep.TOP)

    split(bisect_by=Plane.XZ.offset(8.6752314607), keep=Keep.BOTTOM)

    split(bisect_by=Plane.XY.offset(18.7919850665), keep=Keep.BOTTOM)


with BuildPart() as f6_tool156:
    # F6_s157 → F6_t158 (new body)
    with BuildSketch(Plane.YZ.offset(-4.3079131295)):
        Polygon((-8.6752314607, 19.7728872032), (-6.1433193707, 10.461342101), (-8.6752314607, 14.7728872032), align=None)
    extrude(amount=F6_T158_DEPTH)

    split(bisect_by=Plane(origin=(0, 0, 0), x_dir=(0, 1, 0), z_dir=(-0.8623090204, 0, 0.506382418)), keep=Keep.TOP)

    split(bisect_by=Plane.YZ.offset(8.6752314607), keep=Keep.BOTTOM)

    split(bisect_by=Plane.XY.offset(18.7919850665), keep=Keep.BOTTOM)


with BuildPart() as f6_tool150_1:
    add(f6_tool150.part)

    # F6_t162: intersect F6_tool156
    add(f6_tool156.part, mode=Mode.INTERSECT)


with BuildPart() as f1_22:
    add(f1_21.part)

    # F6_t148: union F6_tool150
    add(f6_tool150_1.part)


with BuildPart() as f6_tool165:
    # F6_s166 → F6_t167 (new body)
    with BuildSketch(Plane.XZ.offset(42.3079131295)):
        Polygon((29.3247685393, 19.7728872032), (31.8566806293, 10.461342101), (29.3247685393, 14.7728872032), align=None)
    extrude(amount=-F6_T167_DEPTH)

    split(bisect_by=Plane.XY.offset(18.7919850665), keep=Keep.BOTTOM)

    split(bisect_by=Plane.XZ.offset(29.3247685393), keep=Keep.TOP)

    split(bisect_by=Plane(origin=(0, -28.2559201757, 16.59300882), x_dir=(1, 0, 0), z_dir=(0, -0.8623090204, 0.506382418)), keep=Keep.TOP)


with BuildPart() as f6_tool171:
    # F6_s172 → F6_t173 (new body)
    with BuildSketch(Plane.YZ.offset(8.6752314607)):
        Polygon((-29.3247685393, 19.7728872032), (-31.8566806293, 10.461342101), (-29.3247685393, 14.7728872032), align=None)
    extrude(amount=F6_T173_DEPTH)

    split(bisect_by=Plane.XY.offset(18.7919850665), keep=Keep.BOTTOM)

    split(bisect_by=Plane.YZ.offset(29.3247685393), keep=Keep.TOP)

    split(bisect_by=Plane(origin=(28.2559201757, 0, 16.59300882), x_dir=(0, 1, 0), z_dir=(0.8623090204, 0, 0.506382418)), keep=Keep.TOP)


with BuildPart() as f6_tool165_1:
    add(f6_tool165.part)

    # F6_t177: intersect F6_tool171
    add(f6_tool171.part, mode=Mode.INTERSECT)


with BuildPart() as f1_23:
    add(f1_22.part)

    # F6_t163: union F6_tool165
    add(f6_tool165_1.part)


with BuildPart() as f6_tool180:
    # F6_s181 → F6_t182 (new body)
    with BuildSketch(Plane.XZ.offset(29.3247685393)):
        Polygon((29.3247685393, 19.7728872032), (31.8566806293, 10.461342101), (29.3247685393, 14.7728872032), align=None)
    extrude(amount=-F6_T182_DEPTH)

    split(bisect_by=Plane.XY.offset(18.7919850665), keep=Keep.BOTTOM)

    split(bisect_by=Plane.XZ.offset(8.6752314607), keep=Keep.BOTTOM)

    split(bisect_by=Plane(origin=(0, 0, 0), x_dir=(1, 0, 0), z_dir=(0, 0.8623090204, 0.506382418)), keep=Keep.TOP)


with BuildPart() as f6_tool186:
    # F6_s187 → F6_t188 (new body)
    with BuildSketch(Plane.YZ.offset(8.6752314607)):
        Polygon((-8.6752314607, 19.7728872032), (-6.1433193707, 10.461342101), (-8.6752314607, 14.7728872032), align=None)
    extrude(amount=F6_T188_DEPTH)

    split(bisect_by=Plane.XY.offset(18.7919850665), keep=Keep.BOTTOM)

    split(bisect_by=Plane.YZ.offset(29.3247685393), keep=Keep.TOP)

    split(bisect_by=Plane(origin=(28.2559201757, 0, 16.59300882), x_dir=(0, 1, 0), z_dir=(0.8623090204, 0, 0.506382418)), keep=Keep.TOP)


with BuildPart() as f6_tool180_1:
    add(f6_tool180.part)

    # F6_t192: intersect F6_tool186
    add(f6_tool186.part, mode=Mode.INTERSECT)


with BuildPart() as f1_24:
    add(f1_23.part)

    # F6_t178: union F6_tool180
    add(f6_tool180_1.part)


solid = f1_24.part
